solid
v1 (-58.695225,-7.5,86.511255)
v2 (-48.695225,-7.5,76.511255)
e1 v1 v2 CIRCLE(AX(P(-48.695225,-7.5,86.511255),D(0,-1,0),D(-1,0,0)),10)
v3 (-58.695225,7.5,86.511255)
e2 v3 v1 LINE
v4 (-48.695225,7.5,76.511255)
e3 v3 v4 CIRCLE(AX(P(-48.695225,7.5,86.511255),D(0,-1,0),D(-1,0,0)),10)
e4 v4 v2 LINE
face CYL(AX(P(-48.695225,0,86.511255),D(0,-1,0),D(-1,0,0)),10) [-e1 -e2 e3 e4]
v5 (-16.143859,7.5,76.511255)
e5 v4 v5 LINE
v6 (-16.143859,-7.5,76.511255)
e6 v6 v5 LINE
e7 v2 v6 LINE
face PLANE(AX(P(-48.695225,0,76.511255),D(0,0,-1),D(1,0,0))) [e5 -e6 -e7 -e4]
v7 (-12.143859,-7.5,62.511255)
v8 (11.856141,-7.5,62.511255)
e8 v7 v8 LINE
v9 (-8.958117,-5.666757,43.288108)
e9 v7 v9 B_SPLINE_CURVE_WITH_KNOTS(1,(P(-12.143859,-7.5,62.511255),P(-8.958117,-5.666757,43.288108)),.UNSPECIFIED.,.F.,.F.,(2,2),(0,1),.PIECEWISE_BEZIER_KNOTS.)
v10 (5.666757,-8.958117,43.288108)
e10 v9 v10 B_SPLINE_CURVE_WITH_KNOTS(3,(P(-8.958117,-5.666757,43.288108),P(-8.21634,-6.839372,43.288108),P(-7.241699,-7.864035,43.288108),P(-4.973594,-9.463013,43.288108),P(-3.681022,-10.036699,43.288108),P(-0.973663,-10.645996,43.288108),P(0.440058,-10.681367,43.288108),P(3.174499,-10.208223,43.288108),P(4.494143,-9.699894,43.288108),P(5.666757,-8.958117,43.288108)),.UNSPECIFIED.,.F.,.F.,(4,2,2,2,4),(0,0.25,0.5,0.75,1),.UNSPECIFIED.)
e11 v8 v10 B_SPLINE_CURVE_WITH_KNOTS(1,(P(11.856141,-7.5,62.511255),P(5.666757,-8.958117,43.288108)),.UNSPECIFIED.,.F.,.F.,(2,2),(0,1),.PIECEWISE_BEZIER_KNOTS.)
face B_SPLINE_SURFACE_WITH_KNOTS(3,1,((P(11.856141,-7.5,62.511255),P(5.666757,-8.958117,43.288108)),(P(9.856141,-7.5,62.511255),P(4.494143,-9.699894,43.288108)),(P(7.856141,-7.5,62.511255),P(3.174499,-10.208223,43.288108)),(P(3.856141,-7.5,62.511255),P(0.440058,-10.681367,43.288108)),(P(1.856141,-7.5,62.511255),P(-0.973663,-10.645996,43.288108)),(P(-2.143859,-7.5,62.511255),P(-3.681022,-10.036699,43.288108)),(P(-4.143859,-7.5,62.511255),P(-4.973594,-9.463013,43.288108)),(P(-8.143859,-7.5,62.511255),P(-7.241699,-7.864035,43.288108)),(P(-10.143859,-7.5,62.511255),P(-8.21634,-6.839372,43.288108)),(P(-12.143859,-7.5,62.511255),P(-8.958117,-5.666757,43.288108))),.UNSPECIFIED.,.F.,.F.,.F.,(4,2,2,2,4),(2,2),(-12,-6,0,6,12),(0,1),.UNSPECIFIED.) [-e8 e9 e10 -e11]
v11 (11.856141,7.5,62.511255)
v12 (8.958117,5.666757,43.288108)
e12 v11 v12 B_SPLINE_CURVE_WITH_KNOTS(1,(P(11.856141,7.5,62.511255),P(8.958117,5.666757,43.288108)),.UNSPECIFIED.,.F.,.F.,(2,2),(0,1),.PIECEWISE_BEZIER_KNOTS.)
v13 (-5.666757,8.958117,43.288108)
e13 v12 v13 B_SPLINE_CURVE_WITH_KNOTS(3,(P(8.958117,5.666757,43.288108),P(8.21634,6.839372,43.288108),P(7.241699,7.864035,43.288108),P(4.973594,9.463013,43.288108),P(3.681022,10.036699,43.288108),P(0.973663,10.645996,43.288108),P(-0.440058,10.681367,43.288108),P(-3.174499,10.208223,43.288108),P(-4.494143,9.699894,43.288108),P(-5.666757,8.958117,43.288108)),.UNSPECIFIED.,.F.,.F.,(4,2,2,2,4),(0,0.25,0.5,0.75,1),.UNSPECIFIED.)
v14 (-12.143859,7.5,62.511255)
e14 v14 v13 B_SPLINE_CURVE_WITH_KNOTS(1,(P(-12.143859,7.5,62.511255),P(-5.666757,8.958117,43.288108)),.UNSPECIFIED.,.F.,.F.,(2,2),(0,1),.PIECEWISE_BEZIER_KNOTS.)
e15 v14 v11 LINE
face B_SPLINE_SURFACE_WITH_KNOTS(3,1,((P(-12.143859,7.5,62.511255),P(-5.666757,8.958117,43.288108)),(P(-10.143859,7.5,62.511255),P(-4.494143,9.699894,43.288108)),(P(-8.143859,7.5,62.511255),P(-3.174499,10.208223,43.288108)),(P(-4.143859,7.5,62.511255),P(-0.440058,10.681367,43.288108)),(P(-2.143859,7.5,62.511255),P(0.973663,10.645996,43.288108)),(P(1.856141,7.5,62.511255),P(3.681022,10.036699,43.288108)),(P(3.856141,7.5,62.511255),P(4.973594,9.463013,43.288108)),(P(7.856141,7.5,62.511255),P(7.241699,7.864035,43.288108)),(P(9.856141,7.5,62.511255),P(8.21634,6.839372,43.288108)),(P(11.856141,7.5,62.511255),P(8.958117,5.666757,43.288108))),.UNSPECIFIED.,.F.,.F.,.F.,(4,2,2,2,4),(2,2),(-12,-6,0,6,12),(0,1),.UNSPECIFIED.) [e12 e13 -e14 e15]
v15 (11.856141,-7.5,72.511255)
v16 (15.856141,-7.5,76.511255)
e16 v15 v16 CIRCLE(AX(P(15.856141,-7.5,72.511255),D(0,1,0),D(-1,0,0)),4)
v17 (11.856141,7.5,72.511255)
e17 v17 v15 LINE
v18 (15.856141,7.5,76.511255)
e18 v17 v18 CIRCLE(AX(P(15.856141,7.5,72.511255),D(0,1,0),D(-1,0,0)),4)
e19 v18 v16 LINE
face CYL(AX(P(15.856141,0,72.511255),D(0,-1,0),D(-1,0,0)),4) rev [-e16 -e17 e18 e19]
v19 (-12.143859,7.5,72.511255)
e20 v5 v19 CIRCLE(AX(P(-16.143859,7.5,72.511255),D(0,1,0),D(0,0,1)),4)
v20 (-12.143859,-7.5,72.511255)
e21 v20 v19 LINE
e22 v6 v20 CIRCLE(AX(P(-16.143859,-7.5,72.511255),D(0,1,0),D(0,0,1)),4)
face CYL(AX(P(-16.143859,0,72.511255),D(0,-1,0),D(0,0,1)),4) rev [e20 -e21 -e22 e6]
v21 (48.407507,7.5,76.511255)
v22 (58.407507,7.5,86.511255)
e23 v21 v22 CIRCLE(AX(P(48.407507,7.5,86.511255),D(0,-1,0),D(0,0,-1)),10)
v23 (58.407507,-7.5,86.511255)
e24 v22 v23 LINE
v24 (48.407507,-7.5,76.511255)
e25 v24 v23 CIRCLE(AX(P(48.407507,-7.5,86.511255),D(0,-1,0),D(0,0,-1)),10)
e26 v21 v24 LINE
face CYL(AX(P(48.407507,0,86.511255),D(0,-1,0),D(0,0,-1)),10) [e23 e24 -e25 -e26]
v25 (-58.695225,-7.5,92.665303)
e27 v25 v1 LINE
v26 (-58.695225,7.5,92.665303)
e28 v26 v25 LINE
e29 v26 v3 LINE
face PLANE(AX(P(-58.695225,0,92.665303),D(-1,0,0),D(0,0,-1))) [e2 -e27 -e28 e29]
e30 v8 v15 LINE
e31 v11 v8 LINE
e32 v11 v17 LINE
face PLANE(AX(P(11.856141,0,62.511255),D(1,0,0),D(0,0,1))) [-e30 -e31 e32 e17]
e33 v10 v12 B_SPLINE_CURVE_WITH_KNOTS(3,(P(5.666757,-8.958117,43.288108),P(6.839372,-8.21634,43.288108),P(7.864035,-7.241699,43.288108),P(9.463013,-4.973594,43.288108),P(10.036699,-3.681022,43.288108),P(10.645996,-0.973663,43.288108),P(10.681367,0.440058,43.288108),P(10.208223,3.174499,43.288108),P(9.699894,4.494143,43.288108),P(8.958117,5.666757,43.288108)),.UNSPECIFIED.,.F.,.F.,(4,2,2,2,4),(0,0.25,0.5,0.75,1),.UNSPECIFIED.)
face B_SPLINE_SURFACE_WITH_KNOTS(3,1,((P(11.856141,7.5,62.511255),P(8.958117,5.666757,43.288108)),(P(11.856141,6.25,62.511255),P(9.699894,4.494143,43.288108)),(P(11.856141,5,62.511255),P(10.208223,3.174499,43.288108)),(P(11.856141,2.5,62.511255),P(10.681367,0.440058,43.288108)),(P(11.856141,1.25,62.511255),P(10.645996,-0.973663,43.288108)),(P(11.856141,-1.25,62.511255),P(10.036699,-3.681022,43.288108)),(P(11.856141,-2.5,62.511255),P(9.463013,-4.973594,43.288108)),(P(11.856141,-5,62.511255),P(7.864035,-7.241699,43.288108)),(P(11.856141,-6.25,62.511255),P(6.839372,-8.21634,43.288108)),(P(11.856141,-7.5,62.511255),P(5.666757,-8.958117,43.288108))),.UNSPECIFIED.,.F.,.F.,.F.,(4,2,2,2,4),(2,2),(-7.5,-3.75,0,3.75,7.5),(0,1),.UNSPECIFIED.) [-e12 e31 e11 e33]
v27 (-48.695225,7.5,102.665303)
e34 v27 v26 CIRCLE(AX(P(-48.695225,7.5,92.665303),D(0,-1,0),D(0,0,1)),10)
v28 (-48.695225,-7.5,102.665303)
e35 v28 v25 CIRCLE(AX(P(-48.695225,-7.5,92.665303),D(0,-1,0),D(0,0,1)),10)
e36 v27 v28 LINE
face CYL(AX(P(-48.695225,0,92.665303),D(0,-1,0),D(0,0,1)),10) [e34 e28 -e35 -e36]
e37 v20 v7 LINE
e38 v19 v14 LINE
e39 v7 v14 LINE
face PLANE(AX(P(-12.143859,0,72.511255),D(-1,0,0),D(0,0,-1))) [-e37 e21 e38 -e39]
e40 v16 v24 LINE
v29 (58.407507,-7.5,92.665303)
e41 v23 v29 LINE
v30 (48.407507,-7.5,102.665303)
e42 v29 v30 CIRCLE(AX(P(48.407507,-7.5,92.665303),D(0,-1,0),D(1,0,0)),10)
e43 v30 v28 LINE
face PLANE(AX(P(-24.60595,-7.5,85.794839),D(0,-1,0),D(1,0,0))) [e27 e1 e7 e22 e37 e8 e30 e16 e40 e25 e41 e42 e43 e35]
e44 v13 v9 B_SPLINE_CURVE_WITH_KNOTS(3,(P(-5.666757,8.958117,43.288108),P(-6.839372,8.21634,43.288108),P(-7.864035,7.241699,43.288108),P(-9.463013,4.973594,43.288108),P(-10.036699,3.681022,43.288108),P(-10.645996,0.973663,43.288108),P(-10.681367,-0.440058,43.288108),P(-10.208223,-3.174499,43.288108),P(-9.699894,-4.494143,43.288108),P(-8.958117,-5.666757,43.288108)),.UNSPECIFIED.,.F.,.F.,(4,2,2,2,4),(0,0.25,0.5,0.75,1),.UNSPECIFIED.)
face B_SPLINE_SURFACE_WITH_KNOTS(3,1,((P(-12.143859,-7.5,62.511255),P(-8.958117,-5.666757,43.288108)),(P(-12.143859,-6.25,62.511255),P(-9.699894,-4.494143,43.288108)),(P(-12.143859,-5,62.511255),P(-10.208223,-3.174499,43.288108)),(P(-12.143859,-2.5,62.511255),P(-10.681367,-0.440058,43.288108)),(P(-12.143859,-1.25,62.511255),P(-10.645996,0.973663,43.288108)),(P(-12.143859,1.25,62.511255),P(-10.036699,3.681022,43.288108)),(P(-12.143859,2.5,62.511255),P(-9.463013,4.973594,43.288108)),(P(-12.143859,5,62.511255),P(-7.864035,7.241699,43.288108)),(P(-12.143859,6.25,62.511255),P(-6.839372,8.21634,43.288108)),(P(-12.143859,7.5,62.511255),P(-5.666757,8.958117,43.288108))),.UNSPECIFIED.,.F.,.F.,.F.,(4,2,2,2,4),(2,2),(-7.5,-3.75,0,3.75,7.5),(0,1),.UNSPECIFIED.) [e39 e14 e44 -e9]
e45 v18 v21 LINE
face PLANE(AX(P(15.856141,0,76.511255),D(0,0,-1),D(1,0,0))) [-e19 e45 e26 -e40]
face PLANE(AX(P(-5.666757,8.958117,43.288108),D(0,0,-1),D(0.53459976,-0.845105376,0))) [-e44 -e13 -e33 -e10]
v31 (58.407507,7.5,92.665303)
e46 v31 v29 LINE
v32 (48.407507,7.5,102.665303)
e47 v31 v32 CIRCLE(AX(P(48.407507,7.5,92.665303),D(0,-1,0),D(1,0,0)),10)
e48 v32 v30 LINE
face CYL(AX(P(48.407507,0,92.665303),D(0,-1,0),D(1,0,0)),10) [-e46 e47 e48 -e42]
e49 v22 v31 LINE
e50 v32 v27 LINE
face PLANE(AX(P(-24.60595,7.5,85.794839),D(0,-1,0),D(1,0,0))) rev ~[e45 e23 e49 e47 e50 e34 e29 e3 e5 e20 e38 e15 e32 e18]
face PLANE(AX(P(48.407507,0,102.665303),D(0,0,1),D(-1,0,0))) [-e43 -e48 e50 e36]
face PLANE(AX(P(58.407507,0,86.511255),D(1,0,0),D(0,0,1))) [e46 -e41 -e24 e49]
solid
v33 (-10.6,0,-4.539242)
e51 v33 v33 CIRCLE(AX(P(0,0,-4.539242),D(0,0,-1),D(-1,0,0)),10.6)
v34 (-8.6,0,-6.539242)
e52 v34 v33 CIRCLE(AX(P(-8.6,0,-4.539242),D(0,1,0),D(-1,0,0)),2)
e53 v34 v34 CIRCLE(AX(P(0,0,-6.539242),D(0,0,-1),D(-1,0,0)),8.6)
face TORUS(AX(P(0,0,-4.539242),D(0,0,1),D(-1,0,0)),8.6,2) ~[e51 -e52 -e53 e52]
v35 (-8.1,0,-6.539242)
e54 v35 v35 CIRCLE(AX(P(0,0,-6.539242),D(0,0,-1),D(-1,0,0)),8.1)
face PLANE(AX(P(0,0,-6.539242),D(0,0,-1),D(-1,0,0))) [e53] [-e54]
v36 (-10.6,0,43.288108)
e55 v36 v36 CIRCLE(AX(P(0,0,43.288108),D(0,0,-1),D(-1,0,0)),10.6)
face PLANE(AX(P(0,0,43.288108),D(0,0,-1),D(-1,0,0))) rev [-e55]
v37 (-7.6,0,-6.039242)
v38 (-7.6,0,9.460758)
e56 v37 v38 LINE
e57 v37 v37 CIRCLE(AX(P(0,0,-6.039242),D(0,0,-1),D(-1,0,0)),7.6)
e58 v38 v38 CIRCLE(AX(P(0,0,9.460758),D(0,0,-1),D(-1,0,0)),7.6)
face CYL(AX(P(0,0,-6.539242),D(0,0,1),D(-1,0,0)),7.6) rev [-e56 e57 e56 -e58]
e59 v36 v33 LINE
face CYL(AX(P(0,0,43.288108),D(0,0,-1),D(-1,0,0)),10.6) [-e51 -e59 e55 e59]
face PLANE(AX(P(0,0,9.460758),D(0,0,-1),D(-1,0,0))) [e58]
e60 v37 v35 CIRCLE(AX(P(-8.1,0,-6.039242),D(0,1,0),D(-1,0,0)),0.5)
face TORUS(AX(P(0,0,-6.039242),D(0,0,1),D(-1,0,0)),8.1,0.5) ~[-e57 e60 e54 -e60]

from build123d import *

# Parameters (mm, degrees)
F2_R      = 0.5
F4_DEPTH  = 7.5
F4_FACE_W = 24
F4_FACE_H = 15
F6_R      = 2


# Not quite as in the source:
# - the arcs of a loft's sections are written as splines that run evenly, so that the points pair up as in the source's solid


with BuildPart() as f1:
    # F0 (on Front) → F1 (revolve)
    with BuildSketch(Plane.XZ):
        Polygon((-7.6, -6.539241709), (-7.6, 9.460758291), (0, 9.460758291), (0, 43.2881079614), (-10.6, 43.2881079614), (-10.6, -6.539241709), align=None)
    revolve(axis=Axis((0, 0, 26.3744331262), (0, 0, -1)))

    # F2
    f2_edges = [f1.edges().sort_by_distance(p)[0] for p in [
        (7.6, 0, -6.539242),
    ]]
    fillet(f2_edges, radius=F2_R)

    # F6
    f6_edges = [f1.edges().sort_by_distance(p)[0] for p in [
        (10.6, 0, -6.539242),
        (8.1, 0, -6.539242),
    ]]
    fillet(f6_edges, radius=F6_R)


with BuildPart() as f4:
    # F3 (on Front) → F4 (new body, symmetric)
    with BuildSketch(Plane.XZ):
        with BuildLine():
            Line((-12.1438586622, 62.5112550155), (-0.1438586622, 62.5112550155))
            Line((-0.1438586622, 62.5112550155), (-0.1438586622, 102.6653030368))
            Line((-0.1438586622, 102.6653030368), (-48.6952245638, 102.6653030368))
            ThreePointArc((-48.6952245638, 102.6653030368), (-55.7662923757, 99.7363708486), (-58.6952245638, 92.6653030368))
            Line((-58.6952245638, 92.6653030368), (-58.6952245638, 86.5112550155))
            ThreePointArc((-58.6952245638, 86.5112550155), (-55.7662923757, 79.4401872036), (-48.6952245638, 76.5112550155))
            Line((-48.6952245638, 76.5112550155), (-16.1438586622, 76.5112550155))
            ThreePointArc((-16.1438586622, 76.5112550155), (-13.3154315374, 75.3396821402), (-12.1438586622, 72.5112550155))
            Line((-12.1438586622, 72.5112550155), (-12.1438586622, 62.5112550155))
        make_face()
        with BuildLine():
            Line((-0.1438586622, 102.6653030368), (-0.1438586622, 62.5112550155))
            Line((-0.1438586622, 62.5112550155), (11.8561413378, 62.5112550155))
            Line((11.8561413378, 62.5112550155), (11.8561413378, 72.5112550155))
            ThreePointArc((11.8561413378, 72.5112550155), (13.0277142131, 75.3396821402), (15.8561413378, 76.5112550155))
            Line((15.8561413378, 76.5112550155), (48.4075072394, 76.5112550155))
            ThreePointArc((48.4075072394, 76.5112550155), (55.4785750513, 79.4401872036), (58.4075072394, 86.5112550155))
            Line((58.4075072394, 86.5112550155), (58.4075072394, 92.6653030368))
            ThreePointArc((58.4075072394, 92.6653030368), (55.4785750513, 99.7363708486), (48.4075072394, 102.6653030368))
            Line((48.4075072394, 102.6653030368), (-0.1438586622, 102.6653030368))
        make_face()
    extrude(amount=F4_DEPTH, both=True)

    # F4_face (on face) → F5 section 0
    with BuildSketch(Plane(origin=(-0.1438586622, 0, 62.5112550155), x_dir=(1, 0, 0), z_dir=(0, 0, -1))):
        Rectangle(F4_FACE_W, F4_FACE_H)
    # F1_face (on face) → F5 section 1
    with BuildSketch(Plane.XY.offset(43.2881079614)):
        with BuildLine():
            add(Edge.make_bspline(
                [(8.9581169834, 5.6667574602), (8.2163401664, 6.8393722312), (7.2416993998, 7.8640350998), (4.9735940712, 9.463013276), (3.6810219119, 10.0366994541), (0.9736633644, 10.645996332), (-0.4400577936, 10.6813672994), (-3.1744987633, 10.2082229526), (-4.4941426892, 9.6998938003), (-5.6667574602, 8.9581169834)],
                knots=[0, 0, 0, 0, 0.25, 0.25, 0.5, 0.5, 0.75, 0.75, 1, 1, 1, 1], degree=3))
            add(Edge.make_bspline(
                [(-5.6667574602, 8.9581169834), (-6.8393722312, 8.2163401664), (-7.8640350998, 7.2416993998), (-9.463013276, 4.9735940712), (-10.0366994541, 3.6810219119), (-10.645996332, 0.9736633644), (-10.6813672994, -0.4400577936), (-10.2082229526, -3.1744987633), (-9.6998938003, -4.4941426892), (-8.9581169834, -5.6667574602)],
                knots=[0, 0, 0, 0, 0.25, 0.25, 0.5, 0.5, 0.75, 0.75, 1, 1, 1, 1], degree=3))
            add(Edge.make_bspline(
                [(-8.9581169834, -5.6667574602), (-8.2163401664, -6.8393722312), (-7.2416993998, -7.8640350998), (-4.9735940712, -9.463013276), (-3.6810219119, -10.0366994541), (-0.9736633644, -10.645996332), (0.4400577936, -10.6813672994), (3.1744987633, -10.2082229526), (4.4941426892, -9.6998938003), (5.6667574602, -8.9581169834)],
                knots=[0, 0, 0, 0, 0.25, 0.25, 0.5, 0.5, 0.75, 0.75, 1, 1, 1, 1], degree=3))
            add(Edge.make_bspline(
                [(5.6667574602, -8.9581169834), (6.8393722312, -8.2163401664), (7.8640350998, -7.2416993998), (9.463013276, -4.9735940712), (10.0366994541, -3.6810219119), (10.645996332, -0.9736633644), (10.6813672994, 0.4400577936), (10.2082229526, 3.1744987633), (9.6998938003, 4.4941426892), (8.9581169834, 5.6667574602)],
                knots=[0, 0, 0, 0, 0.25, 0.25, 0.5, 0.5, 0.75, 0.75, 1, 1, 1, 1], degree=3))
        make_face()
    loft(ruled=True)


solid = Compound([f1.part, f4.part])
